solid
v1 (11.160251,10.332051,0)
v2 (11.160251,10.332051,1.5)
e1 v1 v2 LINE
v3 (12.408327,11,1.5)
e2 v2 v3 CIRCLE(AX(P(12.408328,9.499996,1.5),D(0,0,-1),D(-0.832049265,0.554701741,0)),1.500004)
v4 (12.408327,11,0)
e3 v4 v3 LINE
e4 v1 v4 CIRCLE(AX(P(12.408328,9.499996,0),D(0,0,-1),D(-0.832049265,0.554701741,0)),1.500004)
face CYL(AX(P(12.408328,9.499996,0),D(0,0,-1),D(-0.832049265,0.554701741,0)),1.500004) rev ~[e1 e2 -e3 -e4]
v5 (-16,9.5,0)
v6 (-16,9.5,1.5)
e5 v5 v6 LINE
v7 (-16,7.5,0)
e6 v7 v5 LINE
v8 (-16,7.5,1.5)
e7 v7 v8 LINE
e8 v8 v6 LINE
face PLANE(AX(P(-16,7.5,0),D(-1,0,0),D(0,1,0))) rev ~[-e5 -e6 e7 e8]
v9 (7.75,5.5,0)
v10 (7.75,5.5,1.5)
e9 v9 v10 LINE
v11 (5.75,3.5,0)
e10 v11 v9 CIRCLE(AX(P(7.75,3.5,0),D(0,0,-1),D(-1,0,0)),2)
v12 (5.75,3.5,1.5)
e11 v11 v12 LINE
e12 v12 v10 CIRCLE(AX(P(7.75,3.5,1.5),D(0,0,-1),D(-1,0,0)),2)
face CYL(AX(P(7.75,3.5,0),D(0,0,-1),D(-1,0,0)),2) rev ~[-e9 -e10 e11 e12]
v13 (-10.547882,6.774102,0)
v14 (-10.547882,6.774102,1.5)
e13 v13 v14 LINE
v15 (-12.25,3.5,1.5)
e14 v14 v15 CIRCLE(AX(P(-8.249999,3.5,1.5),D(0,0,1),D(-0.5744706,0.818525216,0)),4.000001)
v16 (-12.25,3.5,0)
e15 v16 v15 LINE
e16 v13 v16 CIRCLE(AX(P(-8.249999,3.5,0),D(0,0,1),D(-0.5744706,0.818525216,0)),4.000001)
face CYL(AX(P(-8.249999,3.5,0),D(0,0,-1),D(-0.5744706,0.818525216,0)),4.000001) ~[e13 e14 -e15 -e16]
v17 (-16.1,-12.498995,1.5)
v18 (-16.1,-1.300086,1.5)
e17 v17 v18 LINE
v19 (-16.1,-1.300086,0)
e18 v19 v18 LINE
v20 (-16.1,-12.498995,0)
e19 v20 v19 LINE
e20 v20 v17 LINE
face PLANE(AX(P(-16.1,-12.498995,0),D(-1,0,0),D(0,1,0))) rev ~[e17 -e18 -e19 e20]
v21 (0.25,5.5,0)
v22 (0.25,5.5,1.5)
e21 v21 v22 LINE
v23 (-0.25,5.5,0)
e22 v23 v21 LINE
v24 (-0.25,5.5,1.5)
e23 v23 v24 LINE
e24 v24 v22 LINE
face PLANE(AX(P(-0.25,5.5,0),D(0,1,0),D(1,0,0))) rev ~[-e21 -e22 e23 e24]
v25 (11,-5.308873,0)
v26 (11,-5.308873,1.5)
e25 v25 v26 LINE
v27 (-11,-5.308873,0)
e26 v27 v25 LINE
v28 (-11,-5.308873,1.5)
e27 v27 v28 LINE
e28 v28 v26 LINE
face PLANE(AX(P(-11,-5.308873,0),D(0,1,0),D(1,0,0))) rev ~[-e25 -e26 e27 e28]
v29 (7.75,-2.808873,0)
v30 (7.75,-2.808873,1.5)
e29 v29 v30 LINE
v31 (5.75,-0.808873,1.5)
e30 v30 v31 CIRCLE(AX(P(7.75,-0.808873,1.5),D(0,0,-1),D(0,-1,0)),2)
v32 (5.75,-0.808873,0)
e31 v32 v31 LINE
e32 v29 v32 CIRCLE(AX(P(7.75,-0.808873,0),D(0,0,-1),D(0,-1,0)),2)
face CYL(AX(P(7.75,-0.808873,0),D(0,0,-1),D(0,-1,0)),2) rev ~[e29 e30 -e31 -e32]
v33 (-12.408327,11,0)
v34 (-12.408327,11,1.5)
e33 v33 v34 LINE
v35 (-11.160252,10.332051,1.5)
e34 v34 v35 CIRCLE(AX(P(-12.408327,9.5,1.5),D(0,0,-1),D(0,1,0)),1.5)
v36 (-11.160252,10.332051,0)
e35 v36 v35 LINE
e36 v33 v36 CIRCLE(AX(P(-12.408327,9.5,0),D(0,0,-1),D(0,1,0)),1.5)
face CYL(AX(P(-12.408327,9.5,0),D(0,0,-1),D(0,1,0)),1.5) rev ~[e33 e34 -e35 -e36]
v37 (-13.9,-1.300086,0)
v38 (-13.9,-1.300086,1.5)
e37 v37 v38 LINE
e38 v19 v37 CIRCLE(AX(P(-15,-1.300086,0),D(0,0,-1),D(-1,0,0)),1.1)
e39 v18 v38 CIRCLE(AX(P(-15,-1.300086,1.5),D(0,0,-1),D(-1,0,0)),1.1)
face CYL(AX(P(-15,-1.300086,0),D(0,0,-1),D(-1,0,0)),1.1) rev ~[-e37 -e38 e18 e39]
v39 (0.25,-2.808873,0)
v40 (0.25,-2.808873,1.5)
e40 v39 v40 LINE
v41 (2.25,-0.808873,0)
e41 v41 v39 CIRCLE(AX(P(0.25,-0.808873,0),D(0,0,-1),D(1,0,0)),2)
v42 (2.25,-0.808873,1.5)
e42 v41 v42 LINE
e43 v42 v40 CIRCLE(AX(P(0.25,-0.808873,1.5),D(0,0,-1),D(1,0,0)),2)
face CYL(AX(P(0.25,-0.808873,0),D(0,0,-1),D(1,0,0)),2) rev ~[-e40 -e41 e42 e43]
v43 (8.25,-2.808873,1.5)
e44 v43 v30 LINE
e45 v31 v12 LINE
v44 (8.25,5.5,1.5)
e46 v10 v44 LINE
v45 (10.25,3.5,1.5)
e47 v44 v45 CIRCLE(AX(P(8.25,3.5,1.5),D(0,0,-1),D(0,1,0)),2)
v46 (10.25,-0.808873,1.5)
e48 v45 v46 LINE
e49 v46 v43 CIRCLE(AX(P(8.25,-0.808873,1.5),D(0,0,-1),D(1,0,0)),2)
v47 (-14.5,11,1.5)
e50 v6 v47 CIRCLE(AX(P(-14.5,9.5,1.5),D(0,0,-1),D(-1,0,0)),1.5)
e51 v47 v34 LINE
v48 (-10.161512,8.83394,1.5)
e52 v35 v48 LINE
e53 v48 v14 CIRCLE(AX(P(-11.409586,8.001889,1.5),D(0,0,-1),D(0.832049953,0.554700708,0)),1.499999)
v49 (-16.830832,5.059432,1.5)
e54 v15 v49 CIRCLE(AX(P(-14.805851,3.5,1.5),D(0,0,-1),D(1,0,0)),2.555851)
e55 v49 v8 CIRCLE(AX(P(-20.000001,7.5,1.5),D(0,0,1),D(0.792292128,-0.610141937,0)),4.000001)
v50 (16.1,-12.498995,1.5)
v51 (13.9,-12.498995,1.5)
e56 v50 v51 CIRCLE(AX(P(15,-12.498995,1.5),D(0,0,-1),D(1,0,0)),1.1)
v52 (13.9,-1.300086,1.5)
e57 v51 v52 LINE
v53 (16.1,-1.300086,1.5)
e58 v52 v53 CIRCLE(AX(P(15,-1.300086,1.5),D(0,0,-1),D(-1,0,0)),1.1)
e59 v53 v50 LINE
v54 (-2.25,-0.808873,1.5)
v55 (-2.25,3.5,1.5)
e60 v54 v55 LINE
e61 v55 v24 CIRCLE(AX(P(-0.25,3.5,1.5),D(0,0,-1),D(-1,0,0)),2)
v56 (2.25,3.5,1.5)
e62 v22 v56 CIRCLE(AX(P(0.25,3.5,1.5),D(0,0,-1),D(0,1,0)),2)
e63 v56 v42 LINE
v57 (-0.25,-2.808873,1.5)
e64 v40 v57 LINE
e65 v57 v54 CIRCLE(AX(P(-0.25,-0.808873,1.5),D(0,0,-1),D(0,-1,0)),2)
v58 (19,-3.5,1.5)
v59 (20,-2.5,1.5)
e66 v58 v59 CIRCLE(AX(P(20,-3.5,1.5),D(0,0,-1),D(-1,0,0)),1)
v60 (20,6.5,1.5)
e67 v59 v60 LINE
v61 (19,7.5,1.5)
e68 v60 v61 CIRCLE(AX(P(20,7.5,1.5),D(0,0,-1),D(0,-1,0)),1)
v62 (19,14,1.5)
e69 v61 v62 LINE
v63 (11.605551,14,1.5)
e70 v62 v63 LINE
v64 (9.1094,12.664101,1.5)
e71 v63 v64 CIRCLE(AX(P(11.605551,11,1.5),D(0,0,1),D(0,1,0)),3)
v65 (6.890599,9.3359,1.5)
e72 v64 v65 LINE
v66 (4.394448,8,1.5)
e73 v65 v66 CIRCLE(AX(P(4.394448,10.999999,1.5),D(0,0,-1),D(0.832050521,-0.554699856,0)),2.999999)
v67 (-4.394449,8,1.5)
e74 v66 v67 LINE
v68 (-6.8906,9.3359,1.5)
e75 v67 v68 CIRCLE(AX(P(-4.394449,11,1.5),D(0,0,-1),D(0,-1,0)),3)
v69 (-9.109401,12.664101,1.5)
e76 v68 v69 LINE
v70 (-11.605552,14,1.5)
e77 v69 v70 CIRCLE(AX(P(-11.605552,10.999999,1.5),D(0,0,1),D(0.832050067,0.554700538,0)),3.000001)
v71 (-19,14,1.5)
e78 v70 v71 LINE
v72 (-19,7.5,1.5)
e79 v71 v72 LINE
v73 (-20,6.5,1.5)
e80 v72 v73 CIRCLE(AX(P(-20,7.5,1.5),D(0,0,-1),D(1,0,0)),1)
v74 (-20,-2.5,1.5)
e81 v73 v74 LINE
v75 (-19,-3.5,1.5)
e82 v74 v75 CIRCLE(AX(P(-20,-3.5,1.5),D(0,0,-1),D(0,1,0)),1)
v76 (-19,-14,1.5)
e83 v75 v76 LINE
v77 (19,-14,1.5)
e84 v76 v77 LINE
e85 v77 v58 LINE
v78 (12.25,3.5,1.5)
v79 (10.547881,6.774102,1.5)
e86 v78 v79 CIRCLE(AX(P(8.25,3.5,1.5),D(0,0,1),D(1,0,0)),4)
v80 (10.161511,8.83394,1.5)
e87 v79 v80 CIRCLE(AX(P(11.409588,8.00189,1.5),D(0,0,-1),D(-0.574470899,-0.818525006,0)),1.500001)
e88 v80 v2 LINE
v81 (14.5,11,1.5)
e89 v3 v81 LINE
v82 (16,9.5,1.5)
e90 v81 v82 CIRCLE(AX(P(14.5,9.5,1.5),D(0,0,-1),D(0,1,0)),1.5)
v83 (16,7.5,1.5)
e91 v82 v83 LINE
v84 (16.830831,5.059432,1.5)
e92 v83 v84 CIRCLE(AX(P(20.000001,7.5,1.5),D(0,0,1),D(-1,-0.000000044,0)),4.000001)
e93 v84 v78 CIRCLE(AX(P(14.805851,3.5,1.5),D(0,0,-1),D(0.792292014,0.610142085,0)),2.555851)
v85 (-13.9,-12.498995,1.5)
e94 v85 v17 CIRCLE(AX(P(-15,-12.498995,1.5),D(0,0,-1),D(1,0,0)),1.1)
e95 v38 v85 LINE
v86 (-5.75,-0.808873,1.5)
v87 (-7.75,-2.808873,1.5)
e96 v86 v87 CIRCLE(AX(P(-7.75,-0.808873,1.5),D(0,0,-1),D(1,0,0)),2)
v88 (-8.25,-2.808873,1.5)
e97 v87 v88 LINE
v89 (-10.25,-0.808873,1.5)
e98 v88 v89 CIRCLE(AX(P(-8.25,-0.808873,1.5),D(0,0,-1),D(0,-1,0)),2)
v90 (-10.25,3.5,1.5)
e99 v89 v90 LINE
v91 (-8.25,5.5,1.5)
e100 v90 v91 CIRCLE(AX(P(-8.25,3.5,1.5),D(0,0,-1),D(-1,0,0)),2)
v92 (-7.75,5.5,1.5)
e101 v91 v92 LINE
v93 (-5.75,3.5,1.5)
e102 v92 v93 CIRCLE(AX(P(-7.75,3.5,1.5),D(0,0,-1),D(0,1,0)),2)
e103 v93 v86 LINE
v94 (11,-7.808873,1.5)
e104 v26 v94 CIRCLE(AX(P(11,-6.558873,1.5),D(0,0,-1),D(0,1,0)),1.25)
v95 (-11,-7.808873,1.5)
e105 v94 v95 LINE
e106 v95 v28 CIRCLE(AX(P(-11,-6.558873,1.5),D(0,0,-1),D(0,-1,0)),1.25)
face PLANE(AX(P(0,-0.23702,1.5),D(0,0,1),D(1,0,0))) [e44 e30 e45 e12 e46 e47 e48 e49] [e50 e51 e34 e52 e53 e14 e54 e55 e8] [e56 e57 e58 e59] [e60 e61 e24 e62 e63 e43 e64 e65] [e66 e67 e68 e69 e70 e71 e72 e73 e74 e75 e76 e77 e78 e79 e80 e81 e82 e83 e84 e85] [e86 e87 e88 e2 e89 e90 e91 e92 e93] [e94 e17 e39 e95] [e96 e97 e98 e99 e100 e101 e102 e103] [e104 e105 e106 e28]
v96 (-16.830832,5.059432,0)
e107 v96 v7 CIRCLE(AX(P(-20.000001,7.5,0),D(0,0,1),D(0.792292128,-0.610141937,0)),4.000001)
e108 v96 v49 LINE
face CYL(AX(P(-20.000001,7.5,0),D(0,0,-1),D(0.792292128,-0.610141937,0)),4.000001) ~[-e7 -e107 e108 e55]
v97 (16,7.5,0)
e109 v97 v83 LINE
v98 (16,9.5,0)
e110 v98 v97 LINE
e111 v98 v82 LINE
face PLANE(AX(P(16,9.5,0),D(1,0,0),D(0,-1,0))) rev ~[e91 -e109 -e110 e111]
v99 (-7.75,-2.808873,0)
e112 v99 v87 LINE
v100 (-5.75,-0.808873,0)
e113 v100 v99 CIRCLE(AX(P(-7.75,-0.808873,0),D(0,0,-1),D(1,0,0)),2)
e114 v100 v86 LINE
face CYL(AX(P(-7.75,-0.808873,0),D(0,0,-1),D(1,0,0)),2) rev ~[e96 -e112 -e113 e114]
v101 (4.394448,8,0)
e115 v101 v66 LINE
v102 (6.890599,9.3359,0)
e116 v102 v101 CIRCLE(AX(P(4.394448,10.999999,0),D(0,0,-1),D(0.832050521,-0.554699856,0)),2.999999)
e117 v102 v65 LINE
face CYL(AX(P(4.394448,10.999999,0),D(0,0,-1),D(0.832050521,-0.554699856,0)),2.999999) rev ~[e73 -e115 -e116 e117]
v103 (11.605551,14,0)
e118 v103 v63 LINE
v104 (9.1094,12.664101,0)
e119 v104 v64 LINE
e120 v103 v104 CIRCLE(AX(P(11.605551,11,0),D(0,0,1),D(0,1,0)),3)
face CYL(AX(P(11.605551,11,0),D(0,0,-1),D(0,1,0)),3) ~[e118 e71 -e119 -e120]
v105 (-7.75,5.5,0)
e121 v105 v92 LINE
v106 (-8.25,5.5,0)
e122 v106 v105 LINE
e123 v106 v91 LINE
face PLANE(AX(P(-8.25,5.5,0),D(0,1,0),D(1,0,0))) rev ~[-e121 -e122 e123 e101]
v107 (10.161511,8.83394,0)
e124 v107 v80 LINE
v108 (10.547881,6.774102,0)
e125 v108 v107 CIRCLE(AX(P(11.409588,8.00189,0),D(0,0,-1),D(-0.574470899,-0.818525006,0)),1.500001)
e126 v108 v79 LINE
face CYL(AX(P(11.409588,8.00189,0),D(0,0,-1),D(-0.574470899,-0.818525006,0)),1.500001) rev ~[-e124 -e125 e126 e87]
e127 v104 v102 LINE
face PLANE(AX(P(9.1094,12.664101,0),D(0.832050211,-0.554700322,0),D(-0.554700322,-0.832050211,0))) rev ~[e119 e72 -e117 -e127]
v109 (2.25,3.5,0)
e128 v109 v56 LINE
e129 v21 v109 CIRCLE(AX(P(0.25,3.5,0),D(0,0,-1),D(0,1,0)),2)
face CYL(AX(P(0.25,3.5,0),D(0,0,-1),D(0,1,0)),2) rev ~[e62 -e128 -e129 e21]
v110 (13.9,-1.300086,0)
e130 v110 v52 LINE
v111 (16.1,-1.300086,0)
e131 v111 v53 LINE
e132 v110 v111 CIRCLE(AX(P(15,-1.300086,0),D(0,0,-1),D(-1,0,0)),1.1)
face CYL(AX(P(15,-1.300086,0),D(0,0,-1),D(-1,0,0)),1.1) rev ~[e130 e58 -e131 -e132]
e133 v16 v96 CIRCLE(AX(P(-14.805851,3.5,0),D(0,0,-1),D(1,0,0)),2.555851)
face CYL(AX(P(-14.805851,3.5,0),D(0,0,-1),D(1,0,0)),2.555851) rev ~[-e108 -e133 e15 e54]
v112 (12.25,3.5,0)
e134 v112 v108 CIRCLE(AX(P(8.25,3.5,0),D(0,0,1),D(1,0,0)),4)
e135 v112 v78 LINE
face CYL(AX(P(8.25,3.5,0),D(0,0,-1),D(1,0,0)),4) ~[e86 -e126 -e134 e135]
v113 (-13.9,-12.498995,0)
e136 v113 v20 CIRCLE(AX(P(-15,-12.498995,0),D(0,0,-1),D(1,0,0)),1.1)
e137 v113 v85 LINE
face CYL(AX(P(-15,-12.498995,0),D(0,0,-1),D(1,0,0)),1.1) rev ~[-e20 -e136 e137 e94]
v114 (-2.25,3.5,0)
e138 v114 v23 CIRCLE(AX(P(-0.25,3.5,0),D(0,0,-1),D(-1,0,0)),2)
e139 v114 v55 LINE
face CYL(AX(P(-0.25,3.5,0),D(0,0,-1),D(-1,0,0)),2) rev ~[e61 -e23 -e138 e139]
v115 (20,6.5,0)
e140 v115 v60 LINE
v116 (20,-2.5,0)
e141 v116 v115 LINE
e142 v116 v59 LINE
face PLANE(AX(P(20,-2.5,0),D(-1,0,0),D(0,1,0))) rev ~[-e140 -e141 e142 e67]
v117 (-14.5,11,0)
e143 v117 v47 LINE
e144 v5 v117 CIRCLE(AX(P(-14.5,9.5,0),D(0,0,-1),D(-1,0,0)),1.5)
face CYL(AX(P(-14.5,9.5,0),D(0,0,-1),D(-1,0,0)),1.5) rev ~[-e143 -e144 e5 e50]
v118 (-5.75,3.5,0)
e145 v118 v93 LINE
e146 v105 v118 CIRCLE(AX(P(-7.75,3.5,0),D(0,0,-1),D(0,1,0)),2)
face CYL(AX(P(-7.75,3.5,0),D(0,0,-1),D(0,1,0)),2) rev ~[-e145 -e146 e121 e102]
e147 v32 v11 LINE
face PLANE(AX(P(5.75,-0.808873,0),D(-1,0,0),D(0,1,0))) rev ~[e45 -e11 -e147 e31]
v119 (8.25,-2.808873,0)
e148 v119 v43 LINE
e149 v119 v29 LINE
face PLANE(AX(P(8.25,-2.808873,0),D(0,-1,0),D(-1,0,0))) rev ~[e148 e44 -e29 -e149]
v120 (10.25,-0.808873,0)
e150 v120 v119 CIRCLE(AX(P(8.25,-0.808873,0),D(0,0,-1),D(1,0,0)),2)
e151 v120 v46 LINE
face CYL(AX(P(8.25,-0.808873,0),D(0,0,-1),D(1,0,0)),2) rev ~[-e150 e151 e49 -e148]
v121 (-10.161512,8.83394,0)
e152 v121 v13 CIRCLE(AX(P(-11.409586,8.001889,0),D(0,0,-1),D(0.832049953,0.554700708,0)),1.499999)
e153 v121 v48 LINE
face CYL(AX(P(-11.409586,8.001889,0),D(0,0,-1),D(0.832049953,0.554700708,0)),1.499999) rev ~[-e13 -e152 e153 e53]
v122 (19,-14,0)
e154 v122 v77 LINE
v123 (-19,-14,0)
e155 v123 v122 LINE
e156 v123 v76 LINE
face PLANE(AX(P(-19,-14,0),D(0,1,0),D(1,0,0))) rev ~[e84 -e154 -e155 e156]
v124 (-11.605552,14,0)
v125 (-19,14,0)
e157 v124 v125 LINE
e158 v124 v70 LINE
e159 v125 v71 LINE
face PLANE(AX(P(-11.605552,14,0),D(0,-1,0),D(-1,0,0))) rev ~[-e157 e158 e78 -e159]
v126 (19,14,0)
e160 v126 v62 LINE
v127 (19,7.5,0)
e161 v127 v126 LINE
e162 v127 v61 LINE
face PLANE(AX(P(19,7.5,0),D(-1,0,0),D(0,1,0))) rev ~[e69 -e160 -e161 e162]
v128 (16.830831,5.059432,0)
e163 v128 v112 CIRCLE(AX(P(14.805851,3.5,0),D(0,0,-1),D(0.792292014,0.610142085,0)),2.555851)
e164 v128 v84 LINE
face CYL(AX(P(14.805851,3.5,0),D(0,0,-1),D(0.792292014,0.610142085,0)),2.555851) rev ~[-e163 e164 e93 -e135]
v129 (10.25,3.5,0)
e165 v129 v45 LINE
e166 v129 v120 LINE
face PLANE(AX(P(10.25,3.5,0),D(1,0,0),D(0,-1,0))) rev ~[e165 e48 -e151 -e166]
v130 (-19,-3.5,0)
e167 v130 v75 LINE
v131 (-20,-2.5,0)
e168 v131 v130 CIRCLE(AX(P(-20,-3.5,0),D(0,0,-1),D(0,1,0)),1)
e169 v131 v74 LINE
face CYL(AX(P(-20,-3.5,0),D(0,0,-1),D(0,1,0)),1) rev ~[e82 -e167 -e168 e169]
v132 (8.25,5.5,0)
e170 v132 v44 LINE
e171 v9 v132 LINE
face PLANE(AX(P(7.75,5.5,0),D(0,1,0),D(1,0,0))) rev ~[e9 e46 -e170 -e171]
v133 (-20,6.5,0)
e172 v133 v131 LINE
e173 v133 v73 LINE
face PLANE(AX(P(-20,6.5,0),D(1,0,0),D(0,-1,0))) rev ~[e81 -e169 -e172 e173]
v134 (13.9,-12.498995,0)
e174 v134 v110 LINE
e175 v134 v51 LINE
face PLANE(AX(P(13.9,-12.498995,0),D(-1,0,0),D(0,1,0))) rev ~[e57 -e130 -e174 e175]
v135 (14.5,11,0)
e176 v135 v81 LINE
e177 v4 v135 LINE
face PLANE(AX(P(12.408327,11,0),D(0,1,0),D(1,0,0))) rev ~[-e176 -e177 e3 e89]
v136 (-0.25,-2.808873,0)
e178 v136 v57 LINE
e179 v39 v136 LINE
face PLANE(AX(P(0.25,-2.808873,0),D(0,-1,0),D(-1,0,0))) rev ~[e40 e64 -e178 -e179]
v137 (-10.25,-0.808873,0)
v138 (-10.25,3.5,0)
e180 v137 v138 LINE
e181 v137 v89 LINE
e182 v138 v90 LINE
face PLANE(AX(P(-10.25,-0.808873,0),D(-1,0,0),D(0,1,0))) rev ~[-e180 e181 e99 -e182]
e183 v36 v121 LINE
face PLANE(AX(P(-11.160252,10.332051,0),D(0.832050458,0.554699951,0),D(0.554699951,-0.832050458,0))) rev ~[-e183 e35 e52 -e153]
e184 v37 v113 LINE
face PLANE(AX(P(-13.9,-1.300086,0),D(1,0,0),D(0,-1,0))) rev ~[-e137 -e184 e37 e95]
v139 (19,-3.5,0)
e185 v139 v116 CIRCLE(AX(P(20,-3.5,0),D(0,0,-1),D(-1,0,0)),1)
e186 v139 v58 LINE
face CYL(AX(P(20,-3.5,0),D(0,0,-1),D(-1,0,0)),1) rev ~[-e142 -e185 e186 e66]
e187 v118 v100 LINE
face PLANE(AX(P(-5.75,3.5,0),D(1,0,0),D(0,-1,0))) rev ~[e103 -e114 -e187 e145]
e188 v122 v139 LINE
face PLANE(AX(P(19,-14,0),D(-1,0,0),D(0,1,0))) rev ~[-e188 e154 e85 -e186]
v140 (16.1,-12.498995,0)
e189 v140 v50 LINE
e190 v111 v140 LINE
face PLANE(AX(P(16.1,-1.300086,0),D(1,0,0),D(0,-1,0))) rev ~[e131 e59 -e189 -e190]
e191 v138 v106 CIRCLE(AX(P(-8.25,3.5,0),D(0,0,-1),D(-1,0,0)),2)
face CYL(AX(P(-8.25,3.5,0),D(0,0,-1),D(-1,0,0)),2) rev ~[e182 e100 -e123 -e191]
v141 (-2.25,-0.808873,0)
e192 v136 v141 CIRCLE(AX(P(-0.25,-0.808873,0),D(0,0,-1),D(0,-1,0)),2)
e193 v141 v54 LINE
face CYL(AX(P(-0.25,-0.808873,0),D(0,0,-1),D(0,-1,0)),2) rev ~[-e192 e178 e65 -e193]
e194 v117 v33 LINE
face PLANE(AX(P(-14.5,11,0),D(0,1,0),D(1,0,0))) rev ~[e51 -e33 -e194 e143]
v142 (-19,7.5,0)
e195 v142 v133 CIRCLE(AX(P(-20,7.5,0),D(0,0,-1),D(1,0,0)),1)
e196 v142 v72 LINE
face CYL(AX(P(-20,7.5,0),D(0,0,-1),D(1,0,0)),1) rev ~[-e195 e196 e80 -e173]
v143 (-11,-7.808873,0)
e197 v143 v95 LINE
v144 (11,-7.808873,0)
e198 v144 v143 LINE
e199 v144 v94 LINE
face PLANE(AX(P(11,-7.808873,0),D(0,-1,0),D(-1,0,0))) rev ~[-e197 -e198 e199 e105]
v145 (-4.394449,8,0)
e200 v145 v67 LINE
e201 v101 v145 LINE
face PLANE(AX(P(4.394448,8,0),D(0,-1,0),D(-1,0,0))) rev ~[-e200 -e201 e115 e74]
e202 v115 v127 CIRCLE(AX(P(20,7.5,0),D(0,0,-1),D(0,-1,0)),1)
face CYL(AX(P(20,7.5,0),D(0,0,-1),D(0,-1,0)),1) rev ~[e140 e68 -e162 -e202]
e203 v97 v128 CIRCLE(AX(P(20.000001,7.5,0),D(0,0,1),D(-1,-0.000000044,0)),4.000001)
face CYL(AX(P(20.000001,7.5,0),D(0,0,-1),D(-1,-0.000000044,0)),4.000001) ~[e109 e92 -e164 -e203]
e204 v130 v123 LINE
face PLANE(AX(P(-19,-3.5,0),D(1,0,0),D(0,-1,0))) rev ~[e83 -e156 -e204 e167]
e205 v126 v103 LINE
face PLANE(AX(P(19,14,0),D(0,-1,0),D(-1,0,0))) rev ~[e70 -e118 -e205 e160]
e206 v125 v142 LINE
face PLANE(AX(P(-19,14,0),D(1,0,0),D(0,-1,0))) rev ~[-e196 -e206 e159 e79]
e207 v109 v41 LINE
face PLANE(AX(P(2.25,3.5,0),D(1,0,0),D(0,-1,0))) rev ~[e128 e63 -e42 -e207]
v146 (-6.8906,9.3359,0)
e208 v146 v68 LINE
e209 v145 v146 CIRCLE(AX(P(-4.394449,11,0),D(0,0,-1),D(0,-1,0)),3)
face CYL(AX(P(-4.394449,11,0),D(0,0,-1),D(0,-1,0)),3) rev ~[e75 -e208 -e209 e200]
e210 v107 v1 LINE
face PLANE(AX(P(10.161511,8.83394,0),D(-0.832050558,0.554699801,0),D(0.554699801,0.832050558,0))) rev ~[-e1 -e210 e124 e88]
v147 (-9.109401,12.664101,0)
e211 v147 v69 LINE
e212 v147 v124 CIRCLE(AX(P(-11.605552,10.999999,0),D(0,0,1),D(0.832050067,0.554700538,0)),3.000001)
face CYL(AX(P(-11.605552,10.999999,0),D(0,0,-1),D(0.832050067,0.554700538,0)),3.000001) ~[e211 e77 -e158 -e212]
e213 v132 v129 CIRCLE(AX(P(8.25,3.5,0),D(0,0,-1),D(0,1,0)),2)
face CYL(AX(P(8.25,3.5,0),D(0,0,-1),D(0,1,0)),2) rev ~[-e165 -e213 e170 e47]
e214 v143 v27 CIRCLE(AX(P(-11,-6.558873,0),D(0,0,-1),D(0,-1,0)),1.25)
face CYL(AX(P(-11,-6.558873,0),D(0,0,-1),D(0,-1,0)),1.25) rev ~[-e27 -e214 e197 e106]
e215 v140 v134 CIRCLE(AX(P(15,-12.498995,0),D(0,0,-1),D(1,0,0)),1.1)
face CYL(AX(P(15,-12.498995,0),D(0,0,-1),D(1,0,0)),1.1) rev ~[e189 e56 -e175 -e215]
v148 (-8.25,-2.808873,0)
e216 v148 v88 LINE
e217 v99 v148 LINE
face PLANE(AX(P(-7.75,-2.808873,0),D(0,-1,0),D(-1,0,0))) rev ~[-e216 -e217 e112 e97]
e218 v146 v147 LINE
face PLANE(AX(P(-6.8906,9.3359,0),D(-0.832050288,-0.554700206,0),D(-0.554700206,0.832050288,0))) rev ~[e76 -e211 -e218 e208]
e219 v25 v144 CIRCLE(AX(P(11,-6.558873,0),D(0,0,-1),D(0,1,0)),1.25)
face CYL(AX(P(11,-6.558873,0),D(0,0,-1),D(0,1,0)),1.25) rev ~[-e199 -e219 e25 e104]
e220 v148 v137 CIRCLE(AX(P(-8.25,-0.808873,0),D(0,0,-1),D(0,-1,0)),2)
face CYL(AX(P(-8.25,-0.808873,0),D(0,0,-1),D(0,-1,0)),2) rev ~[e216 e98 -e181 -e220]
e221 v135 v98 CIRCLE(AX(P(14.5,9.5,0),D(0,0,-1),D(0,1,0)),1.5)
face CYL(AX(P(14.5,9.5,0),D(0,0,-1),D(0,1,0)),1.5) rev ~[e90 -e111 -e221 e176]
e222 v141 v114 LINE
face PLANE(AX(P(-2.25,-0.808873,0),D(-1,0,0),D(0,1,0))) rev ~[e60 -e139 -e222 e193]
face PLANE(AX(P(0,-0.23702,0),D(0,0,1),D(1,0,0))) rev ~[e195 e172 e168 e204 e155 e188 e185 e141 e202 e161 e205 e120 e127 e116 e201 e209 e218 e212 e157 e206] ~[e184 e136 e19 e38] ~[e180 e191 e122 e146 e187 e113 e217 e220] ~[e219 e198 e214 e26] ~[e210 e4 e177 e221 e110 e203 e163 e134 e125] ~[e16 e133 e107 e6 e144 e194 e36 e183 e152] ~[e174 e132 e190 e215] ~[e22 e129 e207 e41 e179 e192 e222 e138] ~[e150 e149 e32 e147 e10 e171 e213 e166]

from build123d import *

# Parameters (mm, degrees)
F1_DEPTH = 1.5


# Not quite as in the source:
# - ends of sketch curves that miss each other by under 0.0002 mm in the source are joined


with BuildPart() as f1:
    # F0 (on Top) → F1 (new body)
    with BuildSketch(Plane.XY):
        with BuildLine():
            ThreePointArc((20, 6.5), (19.2928932188, 6.7928932188), (19, 7.5))
            Line((19, 7.5), (19, 14))
            Line((19, 14), (11.605551, 14))
            ThreePointArc((11.605551, 14), (10.1899773457, 13.6450238617), (9.1094002708, 12.6641008194))
            Line((9.1094002708, 12.6641008194), (6.890599, 9.3359))
            ThreePointArc((6.890599, 9.3359), (5.8100220211, 8.3549763346), (4.394448, 8))
            Line((4.394448, 8), (-4.394449, 8))
            ThreePointArc((-4.394449, 8), (-5.8100230211, 8.3549763346), (-6.8906001907, 9.3358998729))
            Line((-6.8906001907, 9.3358998729), (-9.109401, 12.664101))
            ThreePointArc((-9.109401, 12.664101), (-10.1899783457, 13.6450238617), (-11.605552, 14))
            Line((-11.605552, 14), (-19, 14))
            Line((-19, 14), (-19, 7.5))
            ThreePointArc((-19, 7.5), (-19.2928932188, 6.7928932188), (-20, 6.5))
            Line((-20, 6.5), (-20, -2.5))
            ThreePointArc((-20, -2.5), (-19.2928932188, -2.7928932188), (-19, -3.5))
            Line((-19, -3.5), (-19, -14))
            Line((-19, -14), (19, -14))
            Line((19, -14), (19, -3.5))
            ThreePointArc((19, -3.5), (19.2928932188, -2.7928932188), (20, -2.5))
            Line((20, -2.5), (20, 6.5))
        make_face()
        with BuildLine():
            ThreePointArc((-13.9, -12.498995), (-15, -13.598995), (-16.1, -12.498995))
            Line((-16.1, -12.498995), (-16.1, -1.300086))
            ThreePointArc((-16.1, -1.300086), (-15, -0.200086), (-13.9, -1.300086))
            Line((-13.9, -1.300086), (-13.9, -12.498995))
        make_face(mode=Mode.SUBTRACT)
        with BuildLine():
            ThreePointArc((-11, -7.808873), (-12.25, -6.558873), (-11, -5.308873))
            Line((-11, -5.308873), (11, -5.308873))
            ThreePointArc((11, -5.308873), (12.25, -6.558873), (11, -7.808873))
            Line((11, -7.808873), (-11, -7.808873))
        make_face(mode=Mode.SUBTRACT)
        with BuildLine():
            ThreePointArc((16.1, -12.498995), (15, -13.598995), (13.9, -12.498995))
            Line((13.9, -12.498995), (13.9, -1.300086))
            ThreePointArc((13.9, -1.300086), (15, -0.200086), (16.1, -1.300086))
            Line((16.1, -1.300086), (16.1, -12.498995))
        make_face(mode=Mode.SUBTRACT)
        with BuildLine():
            ThreePointArc((-12.25, 3.5), (-15.6295091101, 1.0805038434), (-16.8308317088, 5.0594317757))
            ThreePointArc((-16.8308317088, 5.0594317757), (-16.2134004171, 6.2109446874), (-16, 7.5))
            Line((-16, 7.5), (-16, 9.5))
            ThreePointArc((-16, 9.5), (-15.5606601718, 10.5606601718), (-14.5, 11))
            Line((-14.5, 11), (-12.408327, 11))
            ThreePointArc((-12.408327, 11), (-11.7005404785, 10.8225120945), (-11.16025202, 10.3320509866))
            Line((-11.16025202, 10.3320509866), (-10.161512, 8.83394))
            ThreePointArc((-10.161512, 8.83394), (-9.935298233, 7.7253531463), (-10.5478817855, 6.7741016944))
            ThreePointArc((-10.5478817855, 6.7741016944), (-11.7990510276, 5.3450573983), (-12.25, 3.5))
        make_face(mode=Mode.SUBTRACT)
        with BuildLine():
            Line((-5.75, 3.5), (-5.75, -0.808873))
            ThreePointArc((-5.75, -0.808873), (-6.3357864376, -2.2230865624), (-7.75, -2.808873))
            Line((-7.75, -2.808873), (-8.25, -2.808873))
            ThreePointArc((-8.25, -2.808873), (-9.6642135624, -2.2230865624), (-10.25, -0.808873))
            Line((-10.25, -0.808873), (-10.25, 3.5))
            ThreePointArc((-10.25, 3.5), (-9.6642135624, 4.9142135624), (-8.25, 5.5))
            Line((-8.25, 5.5), (-7.75, 5.5))
            ThreePointArc((-7.75, 5.5), (-6.3357864376, 4.9142135624), (-5.75, 3.5))
        make_face(mode=Mode.SUBTRACT)
        with BuildLine():
            Line((2.25, 3.5), (2.25, -0.808873))
            ThreePointArc((2.25, -0.808873), (1.6642135624, -2.2230865624), (0.25, -2.808873))
            Line((0.25, -2.808873), (-0.25, -2.808873))
            ThreePointArc((-0.25, -2.808873), (-1.6642135624, -2.2230865624), (-2.25, -0.808873))
            Line((-2.25, -0.808873), (-2.25, 3.5))
            ThreePointArc((-2.25, 3.5), (-1.6642135624, 4.9142135624), (-0.25, 5.5))
            Line((-0.25, 5.5), (0.25, 5.5))
            ThreePointArc((0.25, 5.5), (1.6642135624, 4.9142135624), (2.25, 3.5))
        make_face(mode=Mode.SUBTRACT)
        with BuildLine():
            Line((10.25, 3.5), (10.25, -0.808873))
            ThreePointArc((10.25, -0.808873), (9.6642135624, -2.2230865624), (8.25, -2.808873))
            Line((8.25, -2.808873), (7.75, -2.808873))
            ThreePointArc((7.75, -2.808873), (6.3357864376, -2.2230865624), (5.75, -0.808873))
            Line((5.75, -0.808873), (5.75, 3.5))
            ThreePointArc((5.75, 3.5), (6.3357864376, 4.9142135624), (7.75, 5.5))
            Line((7.75, 5.5), (8.25, 5.5))
            ThreePointArc((8.25, 5.5), (9.6642135624, 4.9142135624), (10.25, 3.5))
        make_face(mode=Mode.SUBTRACT)
        with BuildLine():
            ThreePointArc((16.8308313365, 5.0594322592), (15.6295093989, 1.0805039417), (12.25, 3.5))
            ThreePointArc((12.25, 3.5), (11.7990508389, 5.3450577615), (10.5478809284, 6.774101898))
            ThreePointArc((10.5478809284, 6.774101898), (9.9352982087, 7.7253532759), (10.1615112508, 8.8339398328))
            Line((10.1615112508, 8.8339398328), (11.160251, 10.332051))
            ThreePointArc((11.160251, 10.332051), (11.700540234, 10.8225119636), (12.408327, 11))
            Line((12.408327, 11), (14.5, 11))
            ThreePointArc((14.5, 11), (15.5606601718, 10.5606601718), (16, 9.5))
            Line((16, 9.5), (16, 7.5))
            ThreePointArc((16, 7.5), (16.2134003188, 6.2109449762), (16.8308313365, 5.0594322592))
        make_face(mode=Mode.SUBTRACT)
    extrude(amount=F1_DEPTH)


solid = f1.part
